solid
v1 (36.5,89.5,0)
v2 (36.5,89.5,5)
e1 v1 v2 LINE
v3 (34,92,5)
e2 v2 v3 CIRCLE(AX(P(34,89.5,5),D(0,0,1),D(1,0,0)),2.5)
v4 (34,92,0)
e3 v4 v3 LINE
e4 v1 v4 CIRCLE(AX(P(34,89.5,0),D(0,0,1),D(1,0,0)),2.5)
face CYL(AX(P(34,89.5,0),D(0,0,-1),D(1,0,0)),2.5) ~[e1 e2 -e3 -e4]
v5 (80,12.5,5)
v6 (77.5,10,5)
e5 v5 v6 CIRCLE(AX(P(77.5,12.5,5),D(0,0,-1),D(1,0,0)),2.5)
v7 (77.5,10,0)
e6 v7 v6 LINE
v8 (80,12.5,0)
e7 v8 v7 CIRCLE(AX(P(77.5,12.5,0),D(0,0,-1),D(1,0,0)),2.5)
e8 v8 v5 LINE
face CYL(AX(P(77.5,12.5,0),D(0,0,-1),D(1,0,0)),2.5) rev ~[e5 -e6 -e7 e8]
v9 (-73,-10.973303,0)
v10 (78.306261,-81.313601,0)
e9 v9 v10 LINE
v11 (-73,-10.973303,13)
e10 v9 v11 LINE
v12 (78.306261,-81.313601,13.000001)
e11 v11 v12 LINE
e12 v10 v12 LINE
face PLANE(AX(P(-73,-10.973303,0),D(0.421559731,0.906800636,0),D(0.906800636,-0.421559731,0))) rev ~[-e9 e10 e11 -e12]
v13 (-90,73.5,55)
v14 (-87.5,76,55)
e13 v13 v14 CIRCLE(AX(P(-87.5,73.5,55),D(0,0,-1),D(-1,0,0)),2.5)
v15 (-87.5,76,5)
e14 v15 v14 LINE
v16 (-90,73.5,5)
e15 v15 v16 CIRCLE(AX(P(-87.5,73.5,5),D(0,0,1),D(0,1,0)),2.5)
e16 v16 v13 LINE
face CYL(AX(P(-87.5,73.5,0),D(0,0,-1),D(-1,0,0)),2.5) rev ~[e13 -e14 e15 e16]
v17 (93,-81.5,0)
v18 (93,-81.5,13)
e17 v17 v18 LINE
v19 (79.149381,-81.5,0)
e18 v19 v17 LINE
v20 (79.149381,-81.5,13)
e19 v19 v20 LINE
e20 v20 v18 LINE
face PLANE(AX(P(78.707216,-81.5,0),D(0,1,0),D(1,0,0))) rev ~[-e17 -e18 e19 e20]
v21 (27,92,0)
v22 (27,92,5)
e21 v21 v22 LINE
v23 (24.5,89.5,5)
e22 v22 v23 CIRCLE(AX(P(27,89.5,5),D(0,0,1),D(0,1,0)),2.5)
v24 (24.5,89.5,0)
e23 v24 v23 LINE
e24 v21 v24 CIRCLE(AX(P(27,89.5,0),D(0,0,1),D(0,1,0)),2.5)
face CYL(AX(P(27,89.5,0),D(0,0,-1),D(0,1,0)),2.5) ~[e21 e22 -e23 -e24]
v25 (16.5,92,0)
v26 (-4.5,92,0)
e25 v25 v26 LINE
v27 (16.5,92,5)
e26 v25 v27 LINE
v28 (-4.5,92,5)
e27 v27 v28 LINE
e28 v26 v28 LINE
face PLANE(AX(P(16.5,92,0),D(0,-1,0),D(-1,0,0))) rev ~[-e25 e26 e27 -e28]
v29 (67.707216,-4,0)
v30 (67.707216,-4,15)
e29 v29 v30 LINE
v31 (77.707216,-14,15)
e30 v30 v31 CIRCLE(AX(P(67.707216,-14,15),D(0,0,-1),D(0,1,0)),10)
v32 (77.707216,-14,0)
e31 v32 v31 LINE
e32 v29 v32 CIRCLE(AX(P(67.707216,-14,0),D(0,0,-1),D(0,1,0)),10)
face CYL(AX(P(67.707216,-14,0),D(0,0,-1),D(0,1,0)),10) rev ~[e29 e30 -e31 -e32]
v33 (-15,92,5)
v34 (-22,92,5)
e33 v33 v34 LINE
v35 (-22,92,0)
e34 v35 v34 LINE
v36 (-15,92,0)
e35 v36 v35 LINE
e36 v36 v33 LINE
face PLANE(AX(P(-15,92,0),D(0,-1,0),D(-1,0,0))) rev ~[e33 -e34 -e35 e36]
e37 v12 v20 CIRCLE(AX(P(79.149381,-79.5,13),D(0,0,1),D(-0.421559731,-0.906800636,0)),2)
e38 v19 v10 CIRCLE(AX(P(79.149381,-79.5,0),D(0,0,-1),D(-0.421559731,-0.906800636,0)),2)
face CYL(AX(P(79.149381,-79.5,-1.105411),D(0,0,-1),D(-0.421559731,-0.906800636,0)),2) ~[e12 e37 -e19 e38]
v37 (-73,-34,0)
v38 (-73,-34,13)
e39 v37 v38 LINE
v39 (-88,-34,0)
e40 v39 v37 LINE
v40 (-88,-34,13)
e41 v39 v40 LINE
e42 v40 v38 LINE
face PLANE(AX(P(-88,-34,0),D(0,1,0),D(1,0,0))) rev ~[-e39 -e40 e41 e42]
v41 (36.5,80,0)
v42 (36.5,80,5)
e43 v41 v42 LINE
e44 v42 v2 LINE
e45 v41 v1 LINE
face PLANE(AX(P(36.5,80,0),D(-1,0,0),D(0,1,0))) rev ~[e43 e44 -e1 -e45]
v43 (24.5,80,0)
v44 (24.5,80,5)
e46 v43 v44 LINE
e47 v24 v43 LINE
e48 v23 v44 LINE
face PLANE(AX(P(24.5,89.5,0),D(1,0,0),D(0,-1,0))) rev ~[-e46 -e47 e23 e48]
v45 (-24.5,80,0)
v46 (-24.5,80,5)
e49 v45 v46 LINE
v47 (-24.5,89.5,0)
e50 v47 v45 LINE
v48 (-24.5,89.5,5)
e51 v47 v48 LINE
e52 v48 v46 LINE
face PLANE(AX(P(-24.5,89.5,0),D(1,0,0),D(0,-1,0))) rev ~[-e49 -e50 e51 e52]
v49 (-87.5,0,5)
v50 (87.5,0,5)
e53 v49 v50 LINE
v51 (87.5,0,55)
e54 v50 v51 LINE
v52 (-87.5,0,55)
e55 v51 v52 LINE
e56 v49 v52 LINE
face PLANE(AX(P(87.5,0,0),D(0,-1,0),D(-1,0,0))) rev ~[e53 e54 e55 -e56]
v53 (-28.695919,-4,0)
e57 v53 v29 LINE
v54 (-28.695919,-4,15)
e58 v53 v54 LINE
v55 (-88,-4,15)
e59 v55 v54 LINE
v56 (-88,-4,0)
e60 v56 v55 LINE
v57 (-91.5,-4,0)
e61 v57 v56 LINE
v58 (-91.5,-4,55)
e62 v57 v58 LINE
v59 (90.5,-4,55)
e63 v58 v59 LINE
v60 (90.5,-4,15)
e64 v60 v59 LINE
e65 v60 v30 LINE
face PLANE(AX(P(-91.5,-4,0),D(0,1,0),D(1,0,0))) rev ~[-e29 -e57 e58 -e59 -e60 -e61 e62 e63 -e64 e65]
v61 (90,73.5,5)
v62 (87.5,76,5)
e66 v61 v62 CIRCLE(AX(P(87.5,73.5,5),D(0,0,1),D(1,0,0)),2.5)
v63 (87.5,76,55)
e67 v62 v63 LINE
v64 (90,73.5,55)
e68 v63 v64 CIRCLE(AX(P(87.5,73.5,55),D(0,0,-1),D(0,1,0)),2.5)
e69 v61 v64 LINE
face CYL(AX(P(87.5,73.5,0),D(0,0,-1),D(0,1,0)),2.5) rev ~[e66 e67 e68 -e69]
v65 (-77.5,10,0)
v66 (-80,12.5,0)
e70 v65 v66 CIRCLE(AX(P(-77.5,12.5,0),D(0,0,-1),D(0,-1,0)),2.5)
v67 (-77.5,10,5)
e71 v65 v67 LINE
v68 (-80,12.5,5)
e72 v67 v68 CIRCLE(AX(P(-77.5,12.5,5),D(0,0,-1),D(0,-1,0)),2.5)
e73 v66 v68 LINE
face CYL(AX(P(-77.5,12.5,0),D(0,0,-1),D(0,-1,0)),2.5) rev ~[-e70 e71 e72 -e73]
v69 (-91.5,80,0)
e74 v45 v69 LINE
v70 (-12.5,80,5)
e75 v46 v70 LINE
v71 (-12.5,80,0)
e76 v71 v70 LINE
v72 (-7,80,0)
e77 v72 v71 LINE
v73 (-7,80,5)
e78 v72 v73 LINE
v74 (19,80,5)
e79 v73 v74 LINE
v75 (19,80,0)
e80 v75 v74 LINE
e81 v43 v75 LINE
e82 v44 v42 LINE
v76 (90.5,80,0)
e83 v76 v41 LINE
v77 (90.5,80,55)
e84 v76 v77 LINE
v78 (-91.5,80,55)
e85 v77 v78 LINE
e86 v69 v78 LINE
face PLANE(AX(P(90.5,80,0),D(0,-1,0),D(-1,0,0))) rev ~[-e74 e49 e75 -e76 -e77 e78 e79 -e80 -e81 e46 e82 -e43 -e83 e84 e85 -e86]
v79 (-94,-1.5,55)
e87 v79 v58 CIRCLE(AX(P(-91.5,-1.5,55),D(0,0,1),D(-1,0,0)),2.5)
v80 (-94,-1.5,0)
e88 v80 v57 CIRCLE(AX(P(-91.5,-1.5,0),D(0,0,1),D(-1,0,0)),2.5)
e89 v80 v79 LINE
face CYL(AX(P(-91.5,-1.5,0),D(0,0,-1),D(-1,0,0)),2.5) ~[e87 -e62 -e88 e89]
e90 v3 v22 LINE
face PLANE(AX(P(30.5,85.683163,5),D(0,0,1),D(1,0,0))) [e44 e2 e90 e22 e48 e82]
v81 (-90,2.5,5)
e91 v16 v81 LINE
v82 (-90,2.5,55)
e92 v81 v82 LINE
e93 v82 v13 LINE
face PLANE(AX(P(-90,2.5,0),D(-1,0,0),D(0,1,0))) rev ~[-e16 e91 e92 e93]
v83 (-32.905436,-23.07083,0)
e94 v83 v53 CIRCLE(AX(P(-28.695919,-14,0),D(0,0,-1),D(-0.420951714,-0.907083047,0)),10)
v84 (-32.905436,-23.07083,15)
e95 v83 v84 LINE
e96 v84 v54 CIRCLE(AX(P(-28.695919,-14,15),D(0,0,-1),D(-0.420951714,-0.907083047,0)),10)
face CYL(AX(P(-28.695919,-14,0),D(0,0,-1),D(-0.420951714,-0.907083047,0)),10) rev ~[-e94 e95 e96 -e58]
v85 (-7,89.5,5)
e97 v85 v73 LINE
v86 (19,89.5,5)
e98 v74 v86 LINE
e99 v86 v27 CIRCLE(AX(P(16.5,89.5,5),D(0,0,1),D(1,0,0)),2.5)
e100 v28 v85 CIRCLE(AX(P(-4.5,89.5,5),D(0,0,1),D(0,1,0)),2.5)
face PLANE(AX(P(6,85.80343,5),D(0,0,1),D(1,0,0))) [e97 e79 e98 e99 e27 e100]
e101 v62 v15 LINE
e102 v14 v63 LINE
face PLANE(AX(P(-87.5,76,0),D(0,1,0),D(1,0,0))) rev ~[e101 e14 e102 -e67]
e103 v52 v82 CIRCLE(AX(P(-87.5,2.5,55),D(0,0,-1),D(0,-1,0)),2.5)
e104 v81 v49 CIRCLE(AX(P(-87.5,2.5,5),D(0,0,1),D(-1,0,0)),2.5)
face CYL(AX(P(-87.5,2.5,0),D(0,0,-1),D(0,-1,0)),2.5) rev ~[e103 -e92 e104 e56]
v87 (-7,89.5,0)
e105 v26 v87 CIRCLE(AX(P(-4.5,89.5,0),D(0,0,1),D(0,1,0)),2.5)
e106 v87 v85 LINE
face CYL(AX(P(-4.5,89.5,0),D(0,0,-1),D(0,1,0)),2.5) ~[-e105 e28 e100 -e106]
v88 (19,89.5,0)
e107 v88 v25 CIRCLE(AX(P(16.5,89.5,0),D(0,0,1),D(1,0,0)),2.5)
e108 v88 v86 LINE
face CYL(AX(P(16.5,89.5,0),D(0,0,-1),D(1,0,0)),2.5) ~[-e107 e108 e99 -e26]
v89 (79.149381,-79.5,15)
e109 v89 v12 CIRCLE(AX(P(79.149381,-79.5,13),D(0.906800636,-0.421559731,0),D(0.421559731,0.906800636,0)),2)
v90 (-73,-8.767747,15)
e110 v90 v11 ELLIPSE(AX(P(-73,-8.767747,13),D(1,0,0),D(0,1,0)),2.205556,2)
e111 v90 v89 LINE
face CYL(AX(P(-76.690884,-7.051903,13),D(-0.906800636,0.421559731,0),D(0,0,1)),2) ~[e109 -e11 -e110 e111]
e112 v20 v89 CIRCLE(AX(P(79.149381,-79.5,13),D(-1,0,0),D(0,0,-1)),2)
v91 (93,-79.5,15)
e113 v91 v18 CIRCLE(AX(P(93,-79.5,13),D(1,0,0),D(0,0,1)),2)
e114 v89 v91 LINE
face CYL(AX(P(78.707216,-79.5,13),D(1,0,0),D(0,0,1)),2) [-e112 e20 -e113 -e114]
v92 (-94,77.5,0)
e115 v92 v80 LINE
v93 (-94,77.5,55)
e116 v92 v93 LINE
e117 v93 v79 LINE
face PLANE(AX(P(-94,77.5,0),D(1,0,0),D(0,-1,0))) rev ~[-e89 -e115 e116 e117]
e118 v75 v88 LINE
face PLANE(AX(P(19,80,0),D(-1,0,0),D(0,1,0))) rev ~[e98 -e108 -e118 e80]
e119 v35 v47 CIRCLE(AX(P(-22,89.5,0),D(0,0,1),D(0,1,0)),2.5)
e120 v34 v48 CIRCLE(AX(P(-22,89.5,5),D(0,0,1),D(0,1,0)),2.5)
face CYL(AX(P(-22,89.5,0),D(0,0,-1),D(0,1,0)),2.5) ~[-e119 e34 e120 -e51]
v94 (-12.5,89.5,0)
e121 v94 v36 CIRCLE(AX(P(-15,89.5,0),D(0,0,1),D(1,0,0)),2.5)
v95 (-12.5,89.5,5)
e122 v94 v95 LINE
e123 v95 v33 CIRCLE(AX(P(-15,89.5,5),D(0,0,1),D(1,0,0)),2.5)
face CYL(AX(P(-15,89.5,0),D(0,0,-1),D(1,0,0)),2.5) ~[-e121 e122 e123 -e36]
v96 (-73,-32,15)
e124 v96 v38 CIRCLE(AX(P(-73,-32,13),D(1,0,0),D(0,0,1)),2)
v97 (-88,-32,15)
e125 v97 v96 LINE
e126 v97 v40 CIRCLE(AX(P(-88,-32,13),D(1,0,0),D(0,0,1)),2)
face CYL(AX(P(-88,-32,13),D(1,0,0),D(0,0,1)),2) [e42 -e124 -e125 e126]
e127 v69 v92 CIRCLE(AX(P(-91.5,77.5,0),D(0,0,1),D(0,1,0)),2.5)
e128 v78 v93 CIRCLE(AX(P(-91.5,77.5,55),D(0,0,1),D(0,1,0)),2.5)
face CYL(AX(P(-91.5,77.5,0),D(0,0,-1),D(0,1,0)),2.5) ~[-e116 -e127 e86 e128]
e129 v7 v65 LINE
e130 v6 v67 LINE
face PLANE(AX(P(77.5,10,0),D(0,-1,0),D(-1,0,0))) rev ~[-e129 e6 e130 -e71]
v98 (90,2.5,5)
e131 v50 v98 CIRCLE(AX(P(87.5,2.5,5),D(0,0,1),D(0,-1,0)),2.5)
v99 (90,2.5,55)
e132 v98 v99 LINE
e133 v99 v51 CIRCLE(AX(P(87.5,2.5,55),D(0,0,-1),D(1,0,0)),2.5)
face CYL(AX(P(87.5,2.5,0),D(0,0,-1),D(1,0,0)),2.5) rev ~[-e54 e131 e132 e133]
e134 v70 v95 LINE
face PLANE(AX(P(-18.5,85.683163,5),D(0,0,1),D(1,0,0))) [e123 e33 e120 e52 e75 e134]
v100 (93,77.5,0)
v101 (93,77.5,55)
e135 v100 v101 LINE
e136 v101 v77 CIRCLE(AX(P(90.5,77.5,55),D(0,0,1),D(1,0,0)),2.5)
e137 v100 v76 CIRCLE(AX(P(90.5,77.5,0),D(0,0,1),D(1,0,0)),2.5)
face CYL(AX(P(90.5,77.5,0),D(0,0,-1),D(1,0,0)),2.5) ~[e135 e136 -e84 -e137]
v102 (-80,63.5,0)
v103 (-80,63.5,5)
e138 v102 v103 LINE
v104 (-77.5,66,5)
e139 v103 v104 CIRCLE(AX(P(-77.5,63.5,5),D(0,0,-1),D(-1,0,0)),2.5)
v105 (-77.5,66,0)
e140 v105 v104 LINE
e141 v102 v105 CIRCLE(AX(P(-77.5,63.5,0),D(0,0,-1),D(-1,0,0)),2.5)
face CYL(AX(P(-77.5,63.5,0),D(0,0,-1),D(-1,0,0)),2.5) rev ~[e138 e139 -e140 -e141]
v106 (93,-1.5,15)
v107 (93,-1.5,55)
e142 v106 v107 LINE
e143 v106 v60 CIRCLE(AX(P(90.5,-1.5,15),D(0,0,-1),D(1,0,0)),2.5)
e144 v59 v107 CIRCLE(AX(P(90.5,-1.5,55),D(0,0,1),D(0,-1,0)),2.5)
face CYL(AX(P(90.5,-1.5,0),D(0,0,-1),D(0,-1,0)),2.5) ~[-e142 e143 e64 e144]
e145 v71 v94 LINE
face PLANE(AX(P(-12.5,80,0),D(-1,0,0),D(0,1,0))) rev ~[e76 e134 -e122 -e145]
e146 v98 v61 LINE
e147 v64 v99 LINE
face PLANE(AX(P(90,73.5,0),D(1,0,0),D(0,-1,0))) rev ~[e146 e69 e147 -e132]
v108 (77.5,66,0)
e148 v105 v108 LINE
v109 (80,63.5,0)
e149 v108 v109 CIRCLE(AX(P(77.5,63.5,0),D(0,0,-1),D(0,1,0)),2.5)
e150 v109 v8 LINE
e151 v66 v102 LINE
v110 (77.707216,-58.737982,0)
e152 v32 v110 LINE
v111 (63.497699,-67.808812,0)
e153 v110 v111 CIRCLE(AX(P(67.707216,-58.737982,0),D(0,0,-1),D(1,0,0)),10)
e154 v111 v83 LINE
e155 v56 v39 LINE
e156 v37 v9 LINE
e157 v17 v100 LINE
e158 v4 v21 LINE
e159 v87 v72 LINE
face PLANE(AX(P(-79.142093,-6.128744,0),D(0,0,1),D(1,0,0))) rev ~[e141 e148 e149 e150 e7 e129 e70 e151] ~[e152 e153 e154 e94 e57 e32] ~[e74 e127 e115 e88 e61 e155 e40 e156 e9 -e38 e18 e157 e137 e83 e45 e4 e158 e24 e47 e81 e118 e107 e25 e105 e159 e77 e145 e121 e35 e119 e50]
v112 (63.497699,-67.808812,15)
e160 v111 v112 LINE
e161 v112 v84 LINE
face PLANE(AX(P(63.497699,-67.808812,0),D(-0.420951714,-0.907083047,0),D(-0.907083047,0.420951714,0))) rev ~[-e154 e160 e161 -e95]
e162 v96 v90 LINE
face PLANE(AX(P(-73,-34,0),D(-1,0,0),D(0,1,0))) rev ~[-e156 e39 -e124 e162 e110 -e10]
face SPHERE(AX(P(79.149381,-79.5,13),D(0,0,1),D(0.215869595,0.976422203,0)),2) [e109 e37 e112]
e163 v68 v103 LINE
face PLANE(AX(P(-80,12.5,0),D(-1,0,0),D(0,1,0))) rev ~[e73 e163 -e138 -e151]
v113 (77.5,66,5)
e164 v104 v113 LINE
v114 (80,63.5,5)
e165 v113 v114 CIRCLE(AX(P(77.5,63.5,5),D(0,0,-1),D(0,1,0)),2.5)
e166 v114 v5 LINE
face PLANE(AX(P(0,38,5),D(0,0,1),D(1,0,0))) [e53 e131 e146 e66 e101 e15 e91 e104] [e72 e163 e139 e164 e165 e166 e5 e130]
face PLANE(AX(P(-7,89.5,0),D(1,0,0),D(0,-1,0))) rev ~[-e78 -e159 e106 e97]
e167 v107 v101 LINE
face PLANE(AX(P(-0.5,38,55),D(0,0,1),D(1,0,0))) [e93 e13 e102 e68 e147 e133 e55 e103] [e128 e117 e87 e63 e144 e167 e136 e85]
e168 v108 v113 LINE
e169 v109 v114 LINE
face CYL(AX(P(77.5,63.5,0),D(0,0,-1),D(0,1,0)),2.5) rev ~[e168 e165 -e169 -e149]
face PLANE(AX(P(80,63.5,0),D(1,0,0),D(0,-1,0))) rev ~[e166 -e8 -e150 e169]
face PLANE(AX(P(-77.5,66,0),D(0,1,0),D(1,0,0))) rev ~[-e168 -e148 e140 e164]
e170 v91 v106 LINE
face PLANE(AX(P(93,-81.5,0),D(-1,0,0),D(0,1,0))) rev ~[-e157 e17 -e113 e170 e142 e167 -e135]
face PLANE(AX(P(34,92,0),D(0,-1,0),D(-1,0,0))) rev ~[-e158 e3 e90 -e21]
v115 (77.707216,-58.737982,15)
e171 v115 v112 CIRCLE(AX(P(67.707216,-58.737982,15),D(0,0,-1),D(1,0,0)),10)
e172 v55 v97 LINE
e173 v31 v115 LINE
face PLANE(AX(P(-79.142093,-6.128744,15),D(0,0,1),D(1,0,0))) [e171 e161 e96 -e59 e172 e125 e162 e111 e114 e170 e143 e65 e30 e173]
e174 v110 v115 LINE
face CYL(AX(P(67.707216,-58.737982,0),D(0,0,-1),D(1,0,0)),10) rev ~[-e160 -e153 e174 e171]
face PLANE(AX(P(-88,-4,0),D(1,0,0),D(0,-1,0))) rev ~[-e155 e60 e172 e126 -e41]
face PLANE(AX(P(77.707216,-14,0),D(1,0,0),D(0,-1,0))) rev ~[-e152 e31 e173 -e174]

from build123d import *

# Parameters (mm, degrees)
F1_DEPTH     = 55
F2_DEPTH     = 5
F3_DEPTH     = 15
F4_DEPTH     = 15
F5_R         = 2
F6_T1_DEPTH  = 14.1054111362
F6_T6_DEPTH  = 2
F6_T12_DEPTH = 171.8572508491
F7_R         = 2


# Not quite as in the source:
# - a fillet or chamfer that OpenCascade refuses, or shapes differently, is made with other operations: its cross-section is extruded or revolved along the edge and cut away or added
# - a feature names something its author has since deleted; it is built from what else it names


with BuildPart() as f1:
    # F0 (on Top) → F1 (new body)
    with BuildSketch(Plane.XY):
        with BuildLine():
            ThreePointArc((93, 77.5), (92.267766953, 79.267766953), (90.5, 80))
            Line((90.5, 80), (36.5, 80))
            Line((36.5, 80), (24.5, 80))
            Line((24.5, 80), (19, 80))
            Line((19, 80), (-7, 80))
            Line((-7, 80), (-12.5, 80))
            Line((-12.5, 80), (-24.5, 80))
            Line((-24.5, 80), (-74, 80))
            Line((-74, 80), (-91.5, 80))
            ThreePointArc((-91.5, 80), (-93.267766953, 79.267766953), (-94, 77.5))
            Line((-94, 77.5), (-94, 76))
            Line((-94, 76), (-94, 0))
            Line((-94, 0), (-94, -1.5))
            ThreePointArc((-94, -1.5), (-93.267766953, -3.267766953), (-91.5, -4))
            Line((-91.5, -4), (-88, -4))
            Line((-88, -4), (-73, -4))
            Line((-73, -4), (-28.6959191337, -4))
            Line((-28.6959191337, -4), (67.7072161436, -4))
            Line((67.7072161436, -4), (88, -4))
            Line((88, -4), (90.5, -4))
            ThreePointArc((90.5, -4), (92.267766953, -3.267766953), (93, -1.5))
            Line((93, -1.5), (93, 0))
            Line((93, 0), (93, 76))
            Line((93, 76), (93, 77.5))
        make_face()
        with BuildLine():
            ThreePointArc((90, 2.5), (89.267766953, 0.732233047), (87.5, 0))
            Line((87.5, 0), (-87.5, 0))
            ThreePointArc((-87.5, 0), (-89.267766953, 0.732233047), (-90, 2.5))
            Line((-90, 2.5), (-90, 73.5))
            ThreePointArc((-90, 73.5), (-89.267766953, 75.267766953), (-87.5, 76))
            Line((-87.5, 76), (87.5, 76))
            ThreePointArc((87.5, 76), (89.267766953, 75.267766953), (90, 73.5))
            Line((90, 73.5), (90, 2.5))
        make_face(mode=Mode.SUBTRACT)
    extrude(amount=F1_DEPTH)

    # F0 (on Top) → F2 (join)
    with BuildSketch(Plane.XY):
        with BuildLine():
            Line((-87.5, 0), (87.5, 0))
            ThreePointArc((87.5, 0), (89.267766953, 0.732233047), (90, 2.5))
            Line((90, 2.5), (90, 73.5))
            ThreePointArc((90, 73.5), (89.267766953, 75.267766953), (87.5, 76))
            Line((87.5, 76), (-87.5, 76))
            ThreePointArc((-87.5, 76), (-89.267766953, 75.267766953), (-90, 73.5))
            Line((-90, 73.5), (-90, 2.5))
            ThreePointArc((-90, 2.5), (-89.267766953, 0.732233047), (-87.5, 0))
        make_face()
        with BuildLine():
            Line((-77.5, 66), (77.5, 66))
            ThreePointArc((77.5, 66), (79.267766953, 65.267766953), (80, 63.5))
            Line((80, 63.5), (80, 12.5))
            ThreePointArc((80, 12.5), (79.267766953, 10.732233047), (77.5, 10))
            Line((77.5, 10), (-77.5, 10))
            ThreePointArc((-77.5, 10), (-79.267766953, 10.732233047), (-80, 12.5))
            Line((-80, 12.5), (-80, 63.5))
            ThreePointArc((-80, 63.5), (-79.267766953, 65.267766953), (-77.5, 66))
        make_face(mode=Mode.SUBTRACT)
        with BuildLine():
            Line((-24.5, 80), (-12.5, 80))
            Line((-12.5, 80), (-12.5, 89.5))
            ThreePointArc((-12.5, 89.5), (-13.232233047, 91.267766953), (-15, 92))
            Line((-15, 92), (-22, 92))
            ThreePointArc((-22, 92), (-23.767766953, 91.267766953), (-24.5, 89.5))
            Line((-24.5, 89.5), (-24.5, 80))
        make_face()
        with BuildLine():
            Line((-7, 80), (19, 80))
            Line((19, 80), (19, 89.5))
            ThreePointArc((19, 89.5), (18.267766953, 91.267766953), (16.5, 92))
            Line((16.5, 92), (-4.5, 92))
            ThreePointArc((-4.5, 92), (-6.267766953, 91.267766953), (-7, 89.5))
            Line((-7, 89.5), (-7, 80))
        make_face()
        with BuildLine():
            Line((24.5, 80), (36.5, 80))
            Line((36.5, 80), (36.5, 89.5))
            ThreePointArc((36.5, 89.5), (35.767766953, 91.267766953), (34, 92))
            Line((34, 92), (27, 92))
            ThreePointArc((27, 92), (25.232233047, 91.267766953), (24.5, 89.5))
            Line((24.5, 89.5), (24.5, 80))
        make_face()
    extrude(amount=F2_DEPTH)

    # F0 (on Top) → F3 (join)
    with BuildSketch(Plane.XY):
        with BuildLine():
            Line((93, -81.5), (93, -1.5))
            ThreePointArc((93, -1.5), (92.267766953, -3.267766953), (90.5, -4))
            Line((90.5, -4), (88, -4))
            Line((88, -4), (67.7072161436, -4))
            ThreePointArc((67.7072161436, -4), (74.7782839555, -6.9289321881), (77.7072161436, -14))
            Line((77.7072161436, -14), (77.7072161436, -58.7379819401))
            ThreePointArc((77.7072161436, -58.7379819401), (73.0879609173, -67.1669549309), (63.4976990076, -67.8088124137))
            Line((63.4976990076, -67.8088124137), (-32.9054362697, -23.0708304737))
            ThreePointArc((-32.9054362697, -23.0708304737), (-38.4608642113, -11.8445771571), (-28.6959191337, -4))
            Line((-28.6959191337, -4), (-73, -4))
            Line((-73, -4), (-73, -10.9733034172))
            Line((-73, -10.9733034172), (78.7072161436, -81.5))
            Line((78.7072161436, -81.5), (93, -81.5))
        make_face()
    extrude(amount=F3_DEPTH)

    # F0 (on Top) → F4 (join)
    with BuildSketch(Plane.XY):
        Polygon((-88, -4), (-73, -10.9733034172), (-73, -4), align=None)
        Polygon((-73, -34), (-73, -10.9733034172), (-88, -4), (-88, -34), align=None)
    extrude(amount=F4_DEPTH)

    # F5
    f5_edges = [f1.edges().sort_by_distance(p)[0] for p in [
        (85.853608, -81.5, 15),
    ]]
    fillet(f5_edges, radius=F5_R)

    # F6: fillet of radius 2 on 1 edges, made by hand

    # F6_s2 → F6_t1 (cut)
    with BuildSketch(Plane.XY.offset(-1.1054111362)):
        with BuildLine():
            ThreePointArc((78.3062611352, -81.3136012713), (78.7176414075, -81.4528444053), (79.1493805981, -81.5))
            Line((79.1493805981, -81.5), (78.7072161436, -81.5))
            Line((78.7072161436, -81.5), (78.3062611352, -81.3136012713))
        make_face()
    extrude(amount=F6_T1_DEPTH, mode=Mode.SUBTRACT)


with BuildPart() as f6_tool4:
    # F6_s5 → F6_t6 (new body)
    with BuildSketch(Plane.XY.offset(13)):
        Polygon((79.1493805981, -79.5), (78.3062611352, -81.3136012713), (78.7072161436, -81.5), (79.1493805981, -81.5), align=None)
    extrude(amount=F6_T6_DEPTH)

    # F6_s7 → F6_t8 (revolve, cut)
    with BuildSketch(Plane(origin=(79.1493805981, -79.5, 13), x_dir=(0.2158695953, 0.9764222027, 0), z_dir=(0.9764222027, -0.2158695953, 0))):
        with BuildLine():
            ThreePointArc((0, -2), (2, 0), (0, 2))
            Line((0, 2), (0, -2))
        make_face()
    revolve(axis=Axis((79.1493805981, -79.5, 13), (0, 0, 1)), mode=Mode.SUBTRACT)


with BuildPart() as f1_1:
    add(f1.part)

    # F6_t3: cut F6_tool4
    add(f6_tool4.part, mode=Mode.SUBTRACT)


with BuildPart() as f6_tool10:
    # F6_s11 → F6_t12 (new body)
    with BuildSketch(Plane(origin=(-60.3662112187, 28.0634604648, 0), x_dir=(0, 0, 1), z_dir=(0.9068006357, -0.4215597314, 0))):
        with BuildLine():
            ThreePointArc((15, 38.724458908), (14.4142135624, 40.1386724704), (13, 40.724458908))
            Line((13, 40.724458908), (15, 40.724458908))
            Line((15, 40.724458908), (15, 38.724458908))
        make_face()
    extrude(amount=F6_T12_DEPTH)

    split(bisect_by=Plane.YZ.offset(-73), keep=Keep.TOP)


with BuildPart() as f1_2:
    add(f1_1.part)

    # F6_t9: cut F6_tool10
    add(f6_tool10.part, mode=Mode.SUBTRACT)

    # F7
    f7_edges = [f1_2.edges().sort_by_distance(p)[0] for p in [
        (-80.5, -34, 15),
    ]]
    fillet(f7_edges, radius=F7_R)


solid = f1_2.part
